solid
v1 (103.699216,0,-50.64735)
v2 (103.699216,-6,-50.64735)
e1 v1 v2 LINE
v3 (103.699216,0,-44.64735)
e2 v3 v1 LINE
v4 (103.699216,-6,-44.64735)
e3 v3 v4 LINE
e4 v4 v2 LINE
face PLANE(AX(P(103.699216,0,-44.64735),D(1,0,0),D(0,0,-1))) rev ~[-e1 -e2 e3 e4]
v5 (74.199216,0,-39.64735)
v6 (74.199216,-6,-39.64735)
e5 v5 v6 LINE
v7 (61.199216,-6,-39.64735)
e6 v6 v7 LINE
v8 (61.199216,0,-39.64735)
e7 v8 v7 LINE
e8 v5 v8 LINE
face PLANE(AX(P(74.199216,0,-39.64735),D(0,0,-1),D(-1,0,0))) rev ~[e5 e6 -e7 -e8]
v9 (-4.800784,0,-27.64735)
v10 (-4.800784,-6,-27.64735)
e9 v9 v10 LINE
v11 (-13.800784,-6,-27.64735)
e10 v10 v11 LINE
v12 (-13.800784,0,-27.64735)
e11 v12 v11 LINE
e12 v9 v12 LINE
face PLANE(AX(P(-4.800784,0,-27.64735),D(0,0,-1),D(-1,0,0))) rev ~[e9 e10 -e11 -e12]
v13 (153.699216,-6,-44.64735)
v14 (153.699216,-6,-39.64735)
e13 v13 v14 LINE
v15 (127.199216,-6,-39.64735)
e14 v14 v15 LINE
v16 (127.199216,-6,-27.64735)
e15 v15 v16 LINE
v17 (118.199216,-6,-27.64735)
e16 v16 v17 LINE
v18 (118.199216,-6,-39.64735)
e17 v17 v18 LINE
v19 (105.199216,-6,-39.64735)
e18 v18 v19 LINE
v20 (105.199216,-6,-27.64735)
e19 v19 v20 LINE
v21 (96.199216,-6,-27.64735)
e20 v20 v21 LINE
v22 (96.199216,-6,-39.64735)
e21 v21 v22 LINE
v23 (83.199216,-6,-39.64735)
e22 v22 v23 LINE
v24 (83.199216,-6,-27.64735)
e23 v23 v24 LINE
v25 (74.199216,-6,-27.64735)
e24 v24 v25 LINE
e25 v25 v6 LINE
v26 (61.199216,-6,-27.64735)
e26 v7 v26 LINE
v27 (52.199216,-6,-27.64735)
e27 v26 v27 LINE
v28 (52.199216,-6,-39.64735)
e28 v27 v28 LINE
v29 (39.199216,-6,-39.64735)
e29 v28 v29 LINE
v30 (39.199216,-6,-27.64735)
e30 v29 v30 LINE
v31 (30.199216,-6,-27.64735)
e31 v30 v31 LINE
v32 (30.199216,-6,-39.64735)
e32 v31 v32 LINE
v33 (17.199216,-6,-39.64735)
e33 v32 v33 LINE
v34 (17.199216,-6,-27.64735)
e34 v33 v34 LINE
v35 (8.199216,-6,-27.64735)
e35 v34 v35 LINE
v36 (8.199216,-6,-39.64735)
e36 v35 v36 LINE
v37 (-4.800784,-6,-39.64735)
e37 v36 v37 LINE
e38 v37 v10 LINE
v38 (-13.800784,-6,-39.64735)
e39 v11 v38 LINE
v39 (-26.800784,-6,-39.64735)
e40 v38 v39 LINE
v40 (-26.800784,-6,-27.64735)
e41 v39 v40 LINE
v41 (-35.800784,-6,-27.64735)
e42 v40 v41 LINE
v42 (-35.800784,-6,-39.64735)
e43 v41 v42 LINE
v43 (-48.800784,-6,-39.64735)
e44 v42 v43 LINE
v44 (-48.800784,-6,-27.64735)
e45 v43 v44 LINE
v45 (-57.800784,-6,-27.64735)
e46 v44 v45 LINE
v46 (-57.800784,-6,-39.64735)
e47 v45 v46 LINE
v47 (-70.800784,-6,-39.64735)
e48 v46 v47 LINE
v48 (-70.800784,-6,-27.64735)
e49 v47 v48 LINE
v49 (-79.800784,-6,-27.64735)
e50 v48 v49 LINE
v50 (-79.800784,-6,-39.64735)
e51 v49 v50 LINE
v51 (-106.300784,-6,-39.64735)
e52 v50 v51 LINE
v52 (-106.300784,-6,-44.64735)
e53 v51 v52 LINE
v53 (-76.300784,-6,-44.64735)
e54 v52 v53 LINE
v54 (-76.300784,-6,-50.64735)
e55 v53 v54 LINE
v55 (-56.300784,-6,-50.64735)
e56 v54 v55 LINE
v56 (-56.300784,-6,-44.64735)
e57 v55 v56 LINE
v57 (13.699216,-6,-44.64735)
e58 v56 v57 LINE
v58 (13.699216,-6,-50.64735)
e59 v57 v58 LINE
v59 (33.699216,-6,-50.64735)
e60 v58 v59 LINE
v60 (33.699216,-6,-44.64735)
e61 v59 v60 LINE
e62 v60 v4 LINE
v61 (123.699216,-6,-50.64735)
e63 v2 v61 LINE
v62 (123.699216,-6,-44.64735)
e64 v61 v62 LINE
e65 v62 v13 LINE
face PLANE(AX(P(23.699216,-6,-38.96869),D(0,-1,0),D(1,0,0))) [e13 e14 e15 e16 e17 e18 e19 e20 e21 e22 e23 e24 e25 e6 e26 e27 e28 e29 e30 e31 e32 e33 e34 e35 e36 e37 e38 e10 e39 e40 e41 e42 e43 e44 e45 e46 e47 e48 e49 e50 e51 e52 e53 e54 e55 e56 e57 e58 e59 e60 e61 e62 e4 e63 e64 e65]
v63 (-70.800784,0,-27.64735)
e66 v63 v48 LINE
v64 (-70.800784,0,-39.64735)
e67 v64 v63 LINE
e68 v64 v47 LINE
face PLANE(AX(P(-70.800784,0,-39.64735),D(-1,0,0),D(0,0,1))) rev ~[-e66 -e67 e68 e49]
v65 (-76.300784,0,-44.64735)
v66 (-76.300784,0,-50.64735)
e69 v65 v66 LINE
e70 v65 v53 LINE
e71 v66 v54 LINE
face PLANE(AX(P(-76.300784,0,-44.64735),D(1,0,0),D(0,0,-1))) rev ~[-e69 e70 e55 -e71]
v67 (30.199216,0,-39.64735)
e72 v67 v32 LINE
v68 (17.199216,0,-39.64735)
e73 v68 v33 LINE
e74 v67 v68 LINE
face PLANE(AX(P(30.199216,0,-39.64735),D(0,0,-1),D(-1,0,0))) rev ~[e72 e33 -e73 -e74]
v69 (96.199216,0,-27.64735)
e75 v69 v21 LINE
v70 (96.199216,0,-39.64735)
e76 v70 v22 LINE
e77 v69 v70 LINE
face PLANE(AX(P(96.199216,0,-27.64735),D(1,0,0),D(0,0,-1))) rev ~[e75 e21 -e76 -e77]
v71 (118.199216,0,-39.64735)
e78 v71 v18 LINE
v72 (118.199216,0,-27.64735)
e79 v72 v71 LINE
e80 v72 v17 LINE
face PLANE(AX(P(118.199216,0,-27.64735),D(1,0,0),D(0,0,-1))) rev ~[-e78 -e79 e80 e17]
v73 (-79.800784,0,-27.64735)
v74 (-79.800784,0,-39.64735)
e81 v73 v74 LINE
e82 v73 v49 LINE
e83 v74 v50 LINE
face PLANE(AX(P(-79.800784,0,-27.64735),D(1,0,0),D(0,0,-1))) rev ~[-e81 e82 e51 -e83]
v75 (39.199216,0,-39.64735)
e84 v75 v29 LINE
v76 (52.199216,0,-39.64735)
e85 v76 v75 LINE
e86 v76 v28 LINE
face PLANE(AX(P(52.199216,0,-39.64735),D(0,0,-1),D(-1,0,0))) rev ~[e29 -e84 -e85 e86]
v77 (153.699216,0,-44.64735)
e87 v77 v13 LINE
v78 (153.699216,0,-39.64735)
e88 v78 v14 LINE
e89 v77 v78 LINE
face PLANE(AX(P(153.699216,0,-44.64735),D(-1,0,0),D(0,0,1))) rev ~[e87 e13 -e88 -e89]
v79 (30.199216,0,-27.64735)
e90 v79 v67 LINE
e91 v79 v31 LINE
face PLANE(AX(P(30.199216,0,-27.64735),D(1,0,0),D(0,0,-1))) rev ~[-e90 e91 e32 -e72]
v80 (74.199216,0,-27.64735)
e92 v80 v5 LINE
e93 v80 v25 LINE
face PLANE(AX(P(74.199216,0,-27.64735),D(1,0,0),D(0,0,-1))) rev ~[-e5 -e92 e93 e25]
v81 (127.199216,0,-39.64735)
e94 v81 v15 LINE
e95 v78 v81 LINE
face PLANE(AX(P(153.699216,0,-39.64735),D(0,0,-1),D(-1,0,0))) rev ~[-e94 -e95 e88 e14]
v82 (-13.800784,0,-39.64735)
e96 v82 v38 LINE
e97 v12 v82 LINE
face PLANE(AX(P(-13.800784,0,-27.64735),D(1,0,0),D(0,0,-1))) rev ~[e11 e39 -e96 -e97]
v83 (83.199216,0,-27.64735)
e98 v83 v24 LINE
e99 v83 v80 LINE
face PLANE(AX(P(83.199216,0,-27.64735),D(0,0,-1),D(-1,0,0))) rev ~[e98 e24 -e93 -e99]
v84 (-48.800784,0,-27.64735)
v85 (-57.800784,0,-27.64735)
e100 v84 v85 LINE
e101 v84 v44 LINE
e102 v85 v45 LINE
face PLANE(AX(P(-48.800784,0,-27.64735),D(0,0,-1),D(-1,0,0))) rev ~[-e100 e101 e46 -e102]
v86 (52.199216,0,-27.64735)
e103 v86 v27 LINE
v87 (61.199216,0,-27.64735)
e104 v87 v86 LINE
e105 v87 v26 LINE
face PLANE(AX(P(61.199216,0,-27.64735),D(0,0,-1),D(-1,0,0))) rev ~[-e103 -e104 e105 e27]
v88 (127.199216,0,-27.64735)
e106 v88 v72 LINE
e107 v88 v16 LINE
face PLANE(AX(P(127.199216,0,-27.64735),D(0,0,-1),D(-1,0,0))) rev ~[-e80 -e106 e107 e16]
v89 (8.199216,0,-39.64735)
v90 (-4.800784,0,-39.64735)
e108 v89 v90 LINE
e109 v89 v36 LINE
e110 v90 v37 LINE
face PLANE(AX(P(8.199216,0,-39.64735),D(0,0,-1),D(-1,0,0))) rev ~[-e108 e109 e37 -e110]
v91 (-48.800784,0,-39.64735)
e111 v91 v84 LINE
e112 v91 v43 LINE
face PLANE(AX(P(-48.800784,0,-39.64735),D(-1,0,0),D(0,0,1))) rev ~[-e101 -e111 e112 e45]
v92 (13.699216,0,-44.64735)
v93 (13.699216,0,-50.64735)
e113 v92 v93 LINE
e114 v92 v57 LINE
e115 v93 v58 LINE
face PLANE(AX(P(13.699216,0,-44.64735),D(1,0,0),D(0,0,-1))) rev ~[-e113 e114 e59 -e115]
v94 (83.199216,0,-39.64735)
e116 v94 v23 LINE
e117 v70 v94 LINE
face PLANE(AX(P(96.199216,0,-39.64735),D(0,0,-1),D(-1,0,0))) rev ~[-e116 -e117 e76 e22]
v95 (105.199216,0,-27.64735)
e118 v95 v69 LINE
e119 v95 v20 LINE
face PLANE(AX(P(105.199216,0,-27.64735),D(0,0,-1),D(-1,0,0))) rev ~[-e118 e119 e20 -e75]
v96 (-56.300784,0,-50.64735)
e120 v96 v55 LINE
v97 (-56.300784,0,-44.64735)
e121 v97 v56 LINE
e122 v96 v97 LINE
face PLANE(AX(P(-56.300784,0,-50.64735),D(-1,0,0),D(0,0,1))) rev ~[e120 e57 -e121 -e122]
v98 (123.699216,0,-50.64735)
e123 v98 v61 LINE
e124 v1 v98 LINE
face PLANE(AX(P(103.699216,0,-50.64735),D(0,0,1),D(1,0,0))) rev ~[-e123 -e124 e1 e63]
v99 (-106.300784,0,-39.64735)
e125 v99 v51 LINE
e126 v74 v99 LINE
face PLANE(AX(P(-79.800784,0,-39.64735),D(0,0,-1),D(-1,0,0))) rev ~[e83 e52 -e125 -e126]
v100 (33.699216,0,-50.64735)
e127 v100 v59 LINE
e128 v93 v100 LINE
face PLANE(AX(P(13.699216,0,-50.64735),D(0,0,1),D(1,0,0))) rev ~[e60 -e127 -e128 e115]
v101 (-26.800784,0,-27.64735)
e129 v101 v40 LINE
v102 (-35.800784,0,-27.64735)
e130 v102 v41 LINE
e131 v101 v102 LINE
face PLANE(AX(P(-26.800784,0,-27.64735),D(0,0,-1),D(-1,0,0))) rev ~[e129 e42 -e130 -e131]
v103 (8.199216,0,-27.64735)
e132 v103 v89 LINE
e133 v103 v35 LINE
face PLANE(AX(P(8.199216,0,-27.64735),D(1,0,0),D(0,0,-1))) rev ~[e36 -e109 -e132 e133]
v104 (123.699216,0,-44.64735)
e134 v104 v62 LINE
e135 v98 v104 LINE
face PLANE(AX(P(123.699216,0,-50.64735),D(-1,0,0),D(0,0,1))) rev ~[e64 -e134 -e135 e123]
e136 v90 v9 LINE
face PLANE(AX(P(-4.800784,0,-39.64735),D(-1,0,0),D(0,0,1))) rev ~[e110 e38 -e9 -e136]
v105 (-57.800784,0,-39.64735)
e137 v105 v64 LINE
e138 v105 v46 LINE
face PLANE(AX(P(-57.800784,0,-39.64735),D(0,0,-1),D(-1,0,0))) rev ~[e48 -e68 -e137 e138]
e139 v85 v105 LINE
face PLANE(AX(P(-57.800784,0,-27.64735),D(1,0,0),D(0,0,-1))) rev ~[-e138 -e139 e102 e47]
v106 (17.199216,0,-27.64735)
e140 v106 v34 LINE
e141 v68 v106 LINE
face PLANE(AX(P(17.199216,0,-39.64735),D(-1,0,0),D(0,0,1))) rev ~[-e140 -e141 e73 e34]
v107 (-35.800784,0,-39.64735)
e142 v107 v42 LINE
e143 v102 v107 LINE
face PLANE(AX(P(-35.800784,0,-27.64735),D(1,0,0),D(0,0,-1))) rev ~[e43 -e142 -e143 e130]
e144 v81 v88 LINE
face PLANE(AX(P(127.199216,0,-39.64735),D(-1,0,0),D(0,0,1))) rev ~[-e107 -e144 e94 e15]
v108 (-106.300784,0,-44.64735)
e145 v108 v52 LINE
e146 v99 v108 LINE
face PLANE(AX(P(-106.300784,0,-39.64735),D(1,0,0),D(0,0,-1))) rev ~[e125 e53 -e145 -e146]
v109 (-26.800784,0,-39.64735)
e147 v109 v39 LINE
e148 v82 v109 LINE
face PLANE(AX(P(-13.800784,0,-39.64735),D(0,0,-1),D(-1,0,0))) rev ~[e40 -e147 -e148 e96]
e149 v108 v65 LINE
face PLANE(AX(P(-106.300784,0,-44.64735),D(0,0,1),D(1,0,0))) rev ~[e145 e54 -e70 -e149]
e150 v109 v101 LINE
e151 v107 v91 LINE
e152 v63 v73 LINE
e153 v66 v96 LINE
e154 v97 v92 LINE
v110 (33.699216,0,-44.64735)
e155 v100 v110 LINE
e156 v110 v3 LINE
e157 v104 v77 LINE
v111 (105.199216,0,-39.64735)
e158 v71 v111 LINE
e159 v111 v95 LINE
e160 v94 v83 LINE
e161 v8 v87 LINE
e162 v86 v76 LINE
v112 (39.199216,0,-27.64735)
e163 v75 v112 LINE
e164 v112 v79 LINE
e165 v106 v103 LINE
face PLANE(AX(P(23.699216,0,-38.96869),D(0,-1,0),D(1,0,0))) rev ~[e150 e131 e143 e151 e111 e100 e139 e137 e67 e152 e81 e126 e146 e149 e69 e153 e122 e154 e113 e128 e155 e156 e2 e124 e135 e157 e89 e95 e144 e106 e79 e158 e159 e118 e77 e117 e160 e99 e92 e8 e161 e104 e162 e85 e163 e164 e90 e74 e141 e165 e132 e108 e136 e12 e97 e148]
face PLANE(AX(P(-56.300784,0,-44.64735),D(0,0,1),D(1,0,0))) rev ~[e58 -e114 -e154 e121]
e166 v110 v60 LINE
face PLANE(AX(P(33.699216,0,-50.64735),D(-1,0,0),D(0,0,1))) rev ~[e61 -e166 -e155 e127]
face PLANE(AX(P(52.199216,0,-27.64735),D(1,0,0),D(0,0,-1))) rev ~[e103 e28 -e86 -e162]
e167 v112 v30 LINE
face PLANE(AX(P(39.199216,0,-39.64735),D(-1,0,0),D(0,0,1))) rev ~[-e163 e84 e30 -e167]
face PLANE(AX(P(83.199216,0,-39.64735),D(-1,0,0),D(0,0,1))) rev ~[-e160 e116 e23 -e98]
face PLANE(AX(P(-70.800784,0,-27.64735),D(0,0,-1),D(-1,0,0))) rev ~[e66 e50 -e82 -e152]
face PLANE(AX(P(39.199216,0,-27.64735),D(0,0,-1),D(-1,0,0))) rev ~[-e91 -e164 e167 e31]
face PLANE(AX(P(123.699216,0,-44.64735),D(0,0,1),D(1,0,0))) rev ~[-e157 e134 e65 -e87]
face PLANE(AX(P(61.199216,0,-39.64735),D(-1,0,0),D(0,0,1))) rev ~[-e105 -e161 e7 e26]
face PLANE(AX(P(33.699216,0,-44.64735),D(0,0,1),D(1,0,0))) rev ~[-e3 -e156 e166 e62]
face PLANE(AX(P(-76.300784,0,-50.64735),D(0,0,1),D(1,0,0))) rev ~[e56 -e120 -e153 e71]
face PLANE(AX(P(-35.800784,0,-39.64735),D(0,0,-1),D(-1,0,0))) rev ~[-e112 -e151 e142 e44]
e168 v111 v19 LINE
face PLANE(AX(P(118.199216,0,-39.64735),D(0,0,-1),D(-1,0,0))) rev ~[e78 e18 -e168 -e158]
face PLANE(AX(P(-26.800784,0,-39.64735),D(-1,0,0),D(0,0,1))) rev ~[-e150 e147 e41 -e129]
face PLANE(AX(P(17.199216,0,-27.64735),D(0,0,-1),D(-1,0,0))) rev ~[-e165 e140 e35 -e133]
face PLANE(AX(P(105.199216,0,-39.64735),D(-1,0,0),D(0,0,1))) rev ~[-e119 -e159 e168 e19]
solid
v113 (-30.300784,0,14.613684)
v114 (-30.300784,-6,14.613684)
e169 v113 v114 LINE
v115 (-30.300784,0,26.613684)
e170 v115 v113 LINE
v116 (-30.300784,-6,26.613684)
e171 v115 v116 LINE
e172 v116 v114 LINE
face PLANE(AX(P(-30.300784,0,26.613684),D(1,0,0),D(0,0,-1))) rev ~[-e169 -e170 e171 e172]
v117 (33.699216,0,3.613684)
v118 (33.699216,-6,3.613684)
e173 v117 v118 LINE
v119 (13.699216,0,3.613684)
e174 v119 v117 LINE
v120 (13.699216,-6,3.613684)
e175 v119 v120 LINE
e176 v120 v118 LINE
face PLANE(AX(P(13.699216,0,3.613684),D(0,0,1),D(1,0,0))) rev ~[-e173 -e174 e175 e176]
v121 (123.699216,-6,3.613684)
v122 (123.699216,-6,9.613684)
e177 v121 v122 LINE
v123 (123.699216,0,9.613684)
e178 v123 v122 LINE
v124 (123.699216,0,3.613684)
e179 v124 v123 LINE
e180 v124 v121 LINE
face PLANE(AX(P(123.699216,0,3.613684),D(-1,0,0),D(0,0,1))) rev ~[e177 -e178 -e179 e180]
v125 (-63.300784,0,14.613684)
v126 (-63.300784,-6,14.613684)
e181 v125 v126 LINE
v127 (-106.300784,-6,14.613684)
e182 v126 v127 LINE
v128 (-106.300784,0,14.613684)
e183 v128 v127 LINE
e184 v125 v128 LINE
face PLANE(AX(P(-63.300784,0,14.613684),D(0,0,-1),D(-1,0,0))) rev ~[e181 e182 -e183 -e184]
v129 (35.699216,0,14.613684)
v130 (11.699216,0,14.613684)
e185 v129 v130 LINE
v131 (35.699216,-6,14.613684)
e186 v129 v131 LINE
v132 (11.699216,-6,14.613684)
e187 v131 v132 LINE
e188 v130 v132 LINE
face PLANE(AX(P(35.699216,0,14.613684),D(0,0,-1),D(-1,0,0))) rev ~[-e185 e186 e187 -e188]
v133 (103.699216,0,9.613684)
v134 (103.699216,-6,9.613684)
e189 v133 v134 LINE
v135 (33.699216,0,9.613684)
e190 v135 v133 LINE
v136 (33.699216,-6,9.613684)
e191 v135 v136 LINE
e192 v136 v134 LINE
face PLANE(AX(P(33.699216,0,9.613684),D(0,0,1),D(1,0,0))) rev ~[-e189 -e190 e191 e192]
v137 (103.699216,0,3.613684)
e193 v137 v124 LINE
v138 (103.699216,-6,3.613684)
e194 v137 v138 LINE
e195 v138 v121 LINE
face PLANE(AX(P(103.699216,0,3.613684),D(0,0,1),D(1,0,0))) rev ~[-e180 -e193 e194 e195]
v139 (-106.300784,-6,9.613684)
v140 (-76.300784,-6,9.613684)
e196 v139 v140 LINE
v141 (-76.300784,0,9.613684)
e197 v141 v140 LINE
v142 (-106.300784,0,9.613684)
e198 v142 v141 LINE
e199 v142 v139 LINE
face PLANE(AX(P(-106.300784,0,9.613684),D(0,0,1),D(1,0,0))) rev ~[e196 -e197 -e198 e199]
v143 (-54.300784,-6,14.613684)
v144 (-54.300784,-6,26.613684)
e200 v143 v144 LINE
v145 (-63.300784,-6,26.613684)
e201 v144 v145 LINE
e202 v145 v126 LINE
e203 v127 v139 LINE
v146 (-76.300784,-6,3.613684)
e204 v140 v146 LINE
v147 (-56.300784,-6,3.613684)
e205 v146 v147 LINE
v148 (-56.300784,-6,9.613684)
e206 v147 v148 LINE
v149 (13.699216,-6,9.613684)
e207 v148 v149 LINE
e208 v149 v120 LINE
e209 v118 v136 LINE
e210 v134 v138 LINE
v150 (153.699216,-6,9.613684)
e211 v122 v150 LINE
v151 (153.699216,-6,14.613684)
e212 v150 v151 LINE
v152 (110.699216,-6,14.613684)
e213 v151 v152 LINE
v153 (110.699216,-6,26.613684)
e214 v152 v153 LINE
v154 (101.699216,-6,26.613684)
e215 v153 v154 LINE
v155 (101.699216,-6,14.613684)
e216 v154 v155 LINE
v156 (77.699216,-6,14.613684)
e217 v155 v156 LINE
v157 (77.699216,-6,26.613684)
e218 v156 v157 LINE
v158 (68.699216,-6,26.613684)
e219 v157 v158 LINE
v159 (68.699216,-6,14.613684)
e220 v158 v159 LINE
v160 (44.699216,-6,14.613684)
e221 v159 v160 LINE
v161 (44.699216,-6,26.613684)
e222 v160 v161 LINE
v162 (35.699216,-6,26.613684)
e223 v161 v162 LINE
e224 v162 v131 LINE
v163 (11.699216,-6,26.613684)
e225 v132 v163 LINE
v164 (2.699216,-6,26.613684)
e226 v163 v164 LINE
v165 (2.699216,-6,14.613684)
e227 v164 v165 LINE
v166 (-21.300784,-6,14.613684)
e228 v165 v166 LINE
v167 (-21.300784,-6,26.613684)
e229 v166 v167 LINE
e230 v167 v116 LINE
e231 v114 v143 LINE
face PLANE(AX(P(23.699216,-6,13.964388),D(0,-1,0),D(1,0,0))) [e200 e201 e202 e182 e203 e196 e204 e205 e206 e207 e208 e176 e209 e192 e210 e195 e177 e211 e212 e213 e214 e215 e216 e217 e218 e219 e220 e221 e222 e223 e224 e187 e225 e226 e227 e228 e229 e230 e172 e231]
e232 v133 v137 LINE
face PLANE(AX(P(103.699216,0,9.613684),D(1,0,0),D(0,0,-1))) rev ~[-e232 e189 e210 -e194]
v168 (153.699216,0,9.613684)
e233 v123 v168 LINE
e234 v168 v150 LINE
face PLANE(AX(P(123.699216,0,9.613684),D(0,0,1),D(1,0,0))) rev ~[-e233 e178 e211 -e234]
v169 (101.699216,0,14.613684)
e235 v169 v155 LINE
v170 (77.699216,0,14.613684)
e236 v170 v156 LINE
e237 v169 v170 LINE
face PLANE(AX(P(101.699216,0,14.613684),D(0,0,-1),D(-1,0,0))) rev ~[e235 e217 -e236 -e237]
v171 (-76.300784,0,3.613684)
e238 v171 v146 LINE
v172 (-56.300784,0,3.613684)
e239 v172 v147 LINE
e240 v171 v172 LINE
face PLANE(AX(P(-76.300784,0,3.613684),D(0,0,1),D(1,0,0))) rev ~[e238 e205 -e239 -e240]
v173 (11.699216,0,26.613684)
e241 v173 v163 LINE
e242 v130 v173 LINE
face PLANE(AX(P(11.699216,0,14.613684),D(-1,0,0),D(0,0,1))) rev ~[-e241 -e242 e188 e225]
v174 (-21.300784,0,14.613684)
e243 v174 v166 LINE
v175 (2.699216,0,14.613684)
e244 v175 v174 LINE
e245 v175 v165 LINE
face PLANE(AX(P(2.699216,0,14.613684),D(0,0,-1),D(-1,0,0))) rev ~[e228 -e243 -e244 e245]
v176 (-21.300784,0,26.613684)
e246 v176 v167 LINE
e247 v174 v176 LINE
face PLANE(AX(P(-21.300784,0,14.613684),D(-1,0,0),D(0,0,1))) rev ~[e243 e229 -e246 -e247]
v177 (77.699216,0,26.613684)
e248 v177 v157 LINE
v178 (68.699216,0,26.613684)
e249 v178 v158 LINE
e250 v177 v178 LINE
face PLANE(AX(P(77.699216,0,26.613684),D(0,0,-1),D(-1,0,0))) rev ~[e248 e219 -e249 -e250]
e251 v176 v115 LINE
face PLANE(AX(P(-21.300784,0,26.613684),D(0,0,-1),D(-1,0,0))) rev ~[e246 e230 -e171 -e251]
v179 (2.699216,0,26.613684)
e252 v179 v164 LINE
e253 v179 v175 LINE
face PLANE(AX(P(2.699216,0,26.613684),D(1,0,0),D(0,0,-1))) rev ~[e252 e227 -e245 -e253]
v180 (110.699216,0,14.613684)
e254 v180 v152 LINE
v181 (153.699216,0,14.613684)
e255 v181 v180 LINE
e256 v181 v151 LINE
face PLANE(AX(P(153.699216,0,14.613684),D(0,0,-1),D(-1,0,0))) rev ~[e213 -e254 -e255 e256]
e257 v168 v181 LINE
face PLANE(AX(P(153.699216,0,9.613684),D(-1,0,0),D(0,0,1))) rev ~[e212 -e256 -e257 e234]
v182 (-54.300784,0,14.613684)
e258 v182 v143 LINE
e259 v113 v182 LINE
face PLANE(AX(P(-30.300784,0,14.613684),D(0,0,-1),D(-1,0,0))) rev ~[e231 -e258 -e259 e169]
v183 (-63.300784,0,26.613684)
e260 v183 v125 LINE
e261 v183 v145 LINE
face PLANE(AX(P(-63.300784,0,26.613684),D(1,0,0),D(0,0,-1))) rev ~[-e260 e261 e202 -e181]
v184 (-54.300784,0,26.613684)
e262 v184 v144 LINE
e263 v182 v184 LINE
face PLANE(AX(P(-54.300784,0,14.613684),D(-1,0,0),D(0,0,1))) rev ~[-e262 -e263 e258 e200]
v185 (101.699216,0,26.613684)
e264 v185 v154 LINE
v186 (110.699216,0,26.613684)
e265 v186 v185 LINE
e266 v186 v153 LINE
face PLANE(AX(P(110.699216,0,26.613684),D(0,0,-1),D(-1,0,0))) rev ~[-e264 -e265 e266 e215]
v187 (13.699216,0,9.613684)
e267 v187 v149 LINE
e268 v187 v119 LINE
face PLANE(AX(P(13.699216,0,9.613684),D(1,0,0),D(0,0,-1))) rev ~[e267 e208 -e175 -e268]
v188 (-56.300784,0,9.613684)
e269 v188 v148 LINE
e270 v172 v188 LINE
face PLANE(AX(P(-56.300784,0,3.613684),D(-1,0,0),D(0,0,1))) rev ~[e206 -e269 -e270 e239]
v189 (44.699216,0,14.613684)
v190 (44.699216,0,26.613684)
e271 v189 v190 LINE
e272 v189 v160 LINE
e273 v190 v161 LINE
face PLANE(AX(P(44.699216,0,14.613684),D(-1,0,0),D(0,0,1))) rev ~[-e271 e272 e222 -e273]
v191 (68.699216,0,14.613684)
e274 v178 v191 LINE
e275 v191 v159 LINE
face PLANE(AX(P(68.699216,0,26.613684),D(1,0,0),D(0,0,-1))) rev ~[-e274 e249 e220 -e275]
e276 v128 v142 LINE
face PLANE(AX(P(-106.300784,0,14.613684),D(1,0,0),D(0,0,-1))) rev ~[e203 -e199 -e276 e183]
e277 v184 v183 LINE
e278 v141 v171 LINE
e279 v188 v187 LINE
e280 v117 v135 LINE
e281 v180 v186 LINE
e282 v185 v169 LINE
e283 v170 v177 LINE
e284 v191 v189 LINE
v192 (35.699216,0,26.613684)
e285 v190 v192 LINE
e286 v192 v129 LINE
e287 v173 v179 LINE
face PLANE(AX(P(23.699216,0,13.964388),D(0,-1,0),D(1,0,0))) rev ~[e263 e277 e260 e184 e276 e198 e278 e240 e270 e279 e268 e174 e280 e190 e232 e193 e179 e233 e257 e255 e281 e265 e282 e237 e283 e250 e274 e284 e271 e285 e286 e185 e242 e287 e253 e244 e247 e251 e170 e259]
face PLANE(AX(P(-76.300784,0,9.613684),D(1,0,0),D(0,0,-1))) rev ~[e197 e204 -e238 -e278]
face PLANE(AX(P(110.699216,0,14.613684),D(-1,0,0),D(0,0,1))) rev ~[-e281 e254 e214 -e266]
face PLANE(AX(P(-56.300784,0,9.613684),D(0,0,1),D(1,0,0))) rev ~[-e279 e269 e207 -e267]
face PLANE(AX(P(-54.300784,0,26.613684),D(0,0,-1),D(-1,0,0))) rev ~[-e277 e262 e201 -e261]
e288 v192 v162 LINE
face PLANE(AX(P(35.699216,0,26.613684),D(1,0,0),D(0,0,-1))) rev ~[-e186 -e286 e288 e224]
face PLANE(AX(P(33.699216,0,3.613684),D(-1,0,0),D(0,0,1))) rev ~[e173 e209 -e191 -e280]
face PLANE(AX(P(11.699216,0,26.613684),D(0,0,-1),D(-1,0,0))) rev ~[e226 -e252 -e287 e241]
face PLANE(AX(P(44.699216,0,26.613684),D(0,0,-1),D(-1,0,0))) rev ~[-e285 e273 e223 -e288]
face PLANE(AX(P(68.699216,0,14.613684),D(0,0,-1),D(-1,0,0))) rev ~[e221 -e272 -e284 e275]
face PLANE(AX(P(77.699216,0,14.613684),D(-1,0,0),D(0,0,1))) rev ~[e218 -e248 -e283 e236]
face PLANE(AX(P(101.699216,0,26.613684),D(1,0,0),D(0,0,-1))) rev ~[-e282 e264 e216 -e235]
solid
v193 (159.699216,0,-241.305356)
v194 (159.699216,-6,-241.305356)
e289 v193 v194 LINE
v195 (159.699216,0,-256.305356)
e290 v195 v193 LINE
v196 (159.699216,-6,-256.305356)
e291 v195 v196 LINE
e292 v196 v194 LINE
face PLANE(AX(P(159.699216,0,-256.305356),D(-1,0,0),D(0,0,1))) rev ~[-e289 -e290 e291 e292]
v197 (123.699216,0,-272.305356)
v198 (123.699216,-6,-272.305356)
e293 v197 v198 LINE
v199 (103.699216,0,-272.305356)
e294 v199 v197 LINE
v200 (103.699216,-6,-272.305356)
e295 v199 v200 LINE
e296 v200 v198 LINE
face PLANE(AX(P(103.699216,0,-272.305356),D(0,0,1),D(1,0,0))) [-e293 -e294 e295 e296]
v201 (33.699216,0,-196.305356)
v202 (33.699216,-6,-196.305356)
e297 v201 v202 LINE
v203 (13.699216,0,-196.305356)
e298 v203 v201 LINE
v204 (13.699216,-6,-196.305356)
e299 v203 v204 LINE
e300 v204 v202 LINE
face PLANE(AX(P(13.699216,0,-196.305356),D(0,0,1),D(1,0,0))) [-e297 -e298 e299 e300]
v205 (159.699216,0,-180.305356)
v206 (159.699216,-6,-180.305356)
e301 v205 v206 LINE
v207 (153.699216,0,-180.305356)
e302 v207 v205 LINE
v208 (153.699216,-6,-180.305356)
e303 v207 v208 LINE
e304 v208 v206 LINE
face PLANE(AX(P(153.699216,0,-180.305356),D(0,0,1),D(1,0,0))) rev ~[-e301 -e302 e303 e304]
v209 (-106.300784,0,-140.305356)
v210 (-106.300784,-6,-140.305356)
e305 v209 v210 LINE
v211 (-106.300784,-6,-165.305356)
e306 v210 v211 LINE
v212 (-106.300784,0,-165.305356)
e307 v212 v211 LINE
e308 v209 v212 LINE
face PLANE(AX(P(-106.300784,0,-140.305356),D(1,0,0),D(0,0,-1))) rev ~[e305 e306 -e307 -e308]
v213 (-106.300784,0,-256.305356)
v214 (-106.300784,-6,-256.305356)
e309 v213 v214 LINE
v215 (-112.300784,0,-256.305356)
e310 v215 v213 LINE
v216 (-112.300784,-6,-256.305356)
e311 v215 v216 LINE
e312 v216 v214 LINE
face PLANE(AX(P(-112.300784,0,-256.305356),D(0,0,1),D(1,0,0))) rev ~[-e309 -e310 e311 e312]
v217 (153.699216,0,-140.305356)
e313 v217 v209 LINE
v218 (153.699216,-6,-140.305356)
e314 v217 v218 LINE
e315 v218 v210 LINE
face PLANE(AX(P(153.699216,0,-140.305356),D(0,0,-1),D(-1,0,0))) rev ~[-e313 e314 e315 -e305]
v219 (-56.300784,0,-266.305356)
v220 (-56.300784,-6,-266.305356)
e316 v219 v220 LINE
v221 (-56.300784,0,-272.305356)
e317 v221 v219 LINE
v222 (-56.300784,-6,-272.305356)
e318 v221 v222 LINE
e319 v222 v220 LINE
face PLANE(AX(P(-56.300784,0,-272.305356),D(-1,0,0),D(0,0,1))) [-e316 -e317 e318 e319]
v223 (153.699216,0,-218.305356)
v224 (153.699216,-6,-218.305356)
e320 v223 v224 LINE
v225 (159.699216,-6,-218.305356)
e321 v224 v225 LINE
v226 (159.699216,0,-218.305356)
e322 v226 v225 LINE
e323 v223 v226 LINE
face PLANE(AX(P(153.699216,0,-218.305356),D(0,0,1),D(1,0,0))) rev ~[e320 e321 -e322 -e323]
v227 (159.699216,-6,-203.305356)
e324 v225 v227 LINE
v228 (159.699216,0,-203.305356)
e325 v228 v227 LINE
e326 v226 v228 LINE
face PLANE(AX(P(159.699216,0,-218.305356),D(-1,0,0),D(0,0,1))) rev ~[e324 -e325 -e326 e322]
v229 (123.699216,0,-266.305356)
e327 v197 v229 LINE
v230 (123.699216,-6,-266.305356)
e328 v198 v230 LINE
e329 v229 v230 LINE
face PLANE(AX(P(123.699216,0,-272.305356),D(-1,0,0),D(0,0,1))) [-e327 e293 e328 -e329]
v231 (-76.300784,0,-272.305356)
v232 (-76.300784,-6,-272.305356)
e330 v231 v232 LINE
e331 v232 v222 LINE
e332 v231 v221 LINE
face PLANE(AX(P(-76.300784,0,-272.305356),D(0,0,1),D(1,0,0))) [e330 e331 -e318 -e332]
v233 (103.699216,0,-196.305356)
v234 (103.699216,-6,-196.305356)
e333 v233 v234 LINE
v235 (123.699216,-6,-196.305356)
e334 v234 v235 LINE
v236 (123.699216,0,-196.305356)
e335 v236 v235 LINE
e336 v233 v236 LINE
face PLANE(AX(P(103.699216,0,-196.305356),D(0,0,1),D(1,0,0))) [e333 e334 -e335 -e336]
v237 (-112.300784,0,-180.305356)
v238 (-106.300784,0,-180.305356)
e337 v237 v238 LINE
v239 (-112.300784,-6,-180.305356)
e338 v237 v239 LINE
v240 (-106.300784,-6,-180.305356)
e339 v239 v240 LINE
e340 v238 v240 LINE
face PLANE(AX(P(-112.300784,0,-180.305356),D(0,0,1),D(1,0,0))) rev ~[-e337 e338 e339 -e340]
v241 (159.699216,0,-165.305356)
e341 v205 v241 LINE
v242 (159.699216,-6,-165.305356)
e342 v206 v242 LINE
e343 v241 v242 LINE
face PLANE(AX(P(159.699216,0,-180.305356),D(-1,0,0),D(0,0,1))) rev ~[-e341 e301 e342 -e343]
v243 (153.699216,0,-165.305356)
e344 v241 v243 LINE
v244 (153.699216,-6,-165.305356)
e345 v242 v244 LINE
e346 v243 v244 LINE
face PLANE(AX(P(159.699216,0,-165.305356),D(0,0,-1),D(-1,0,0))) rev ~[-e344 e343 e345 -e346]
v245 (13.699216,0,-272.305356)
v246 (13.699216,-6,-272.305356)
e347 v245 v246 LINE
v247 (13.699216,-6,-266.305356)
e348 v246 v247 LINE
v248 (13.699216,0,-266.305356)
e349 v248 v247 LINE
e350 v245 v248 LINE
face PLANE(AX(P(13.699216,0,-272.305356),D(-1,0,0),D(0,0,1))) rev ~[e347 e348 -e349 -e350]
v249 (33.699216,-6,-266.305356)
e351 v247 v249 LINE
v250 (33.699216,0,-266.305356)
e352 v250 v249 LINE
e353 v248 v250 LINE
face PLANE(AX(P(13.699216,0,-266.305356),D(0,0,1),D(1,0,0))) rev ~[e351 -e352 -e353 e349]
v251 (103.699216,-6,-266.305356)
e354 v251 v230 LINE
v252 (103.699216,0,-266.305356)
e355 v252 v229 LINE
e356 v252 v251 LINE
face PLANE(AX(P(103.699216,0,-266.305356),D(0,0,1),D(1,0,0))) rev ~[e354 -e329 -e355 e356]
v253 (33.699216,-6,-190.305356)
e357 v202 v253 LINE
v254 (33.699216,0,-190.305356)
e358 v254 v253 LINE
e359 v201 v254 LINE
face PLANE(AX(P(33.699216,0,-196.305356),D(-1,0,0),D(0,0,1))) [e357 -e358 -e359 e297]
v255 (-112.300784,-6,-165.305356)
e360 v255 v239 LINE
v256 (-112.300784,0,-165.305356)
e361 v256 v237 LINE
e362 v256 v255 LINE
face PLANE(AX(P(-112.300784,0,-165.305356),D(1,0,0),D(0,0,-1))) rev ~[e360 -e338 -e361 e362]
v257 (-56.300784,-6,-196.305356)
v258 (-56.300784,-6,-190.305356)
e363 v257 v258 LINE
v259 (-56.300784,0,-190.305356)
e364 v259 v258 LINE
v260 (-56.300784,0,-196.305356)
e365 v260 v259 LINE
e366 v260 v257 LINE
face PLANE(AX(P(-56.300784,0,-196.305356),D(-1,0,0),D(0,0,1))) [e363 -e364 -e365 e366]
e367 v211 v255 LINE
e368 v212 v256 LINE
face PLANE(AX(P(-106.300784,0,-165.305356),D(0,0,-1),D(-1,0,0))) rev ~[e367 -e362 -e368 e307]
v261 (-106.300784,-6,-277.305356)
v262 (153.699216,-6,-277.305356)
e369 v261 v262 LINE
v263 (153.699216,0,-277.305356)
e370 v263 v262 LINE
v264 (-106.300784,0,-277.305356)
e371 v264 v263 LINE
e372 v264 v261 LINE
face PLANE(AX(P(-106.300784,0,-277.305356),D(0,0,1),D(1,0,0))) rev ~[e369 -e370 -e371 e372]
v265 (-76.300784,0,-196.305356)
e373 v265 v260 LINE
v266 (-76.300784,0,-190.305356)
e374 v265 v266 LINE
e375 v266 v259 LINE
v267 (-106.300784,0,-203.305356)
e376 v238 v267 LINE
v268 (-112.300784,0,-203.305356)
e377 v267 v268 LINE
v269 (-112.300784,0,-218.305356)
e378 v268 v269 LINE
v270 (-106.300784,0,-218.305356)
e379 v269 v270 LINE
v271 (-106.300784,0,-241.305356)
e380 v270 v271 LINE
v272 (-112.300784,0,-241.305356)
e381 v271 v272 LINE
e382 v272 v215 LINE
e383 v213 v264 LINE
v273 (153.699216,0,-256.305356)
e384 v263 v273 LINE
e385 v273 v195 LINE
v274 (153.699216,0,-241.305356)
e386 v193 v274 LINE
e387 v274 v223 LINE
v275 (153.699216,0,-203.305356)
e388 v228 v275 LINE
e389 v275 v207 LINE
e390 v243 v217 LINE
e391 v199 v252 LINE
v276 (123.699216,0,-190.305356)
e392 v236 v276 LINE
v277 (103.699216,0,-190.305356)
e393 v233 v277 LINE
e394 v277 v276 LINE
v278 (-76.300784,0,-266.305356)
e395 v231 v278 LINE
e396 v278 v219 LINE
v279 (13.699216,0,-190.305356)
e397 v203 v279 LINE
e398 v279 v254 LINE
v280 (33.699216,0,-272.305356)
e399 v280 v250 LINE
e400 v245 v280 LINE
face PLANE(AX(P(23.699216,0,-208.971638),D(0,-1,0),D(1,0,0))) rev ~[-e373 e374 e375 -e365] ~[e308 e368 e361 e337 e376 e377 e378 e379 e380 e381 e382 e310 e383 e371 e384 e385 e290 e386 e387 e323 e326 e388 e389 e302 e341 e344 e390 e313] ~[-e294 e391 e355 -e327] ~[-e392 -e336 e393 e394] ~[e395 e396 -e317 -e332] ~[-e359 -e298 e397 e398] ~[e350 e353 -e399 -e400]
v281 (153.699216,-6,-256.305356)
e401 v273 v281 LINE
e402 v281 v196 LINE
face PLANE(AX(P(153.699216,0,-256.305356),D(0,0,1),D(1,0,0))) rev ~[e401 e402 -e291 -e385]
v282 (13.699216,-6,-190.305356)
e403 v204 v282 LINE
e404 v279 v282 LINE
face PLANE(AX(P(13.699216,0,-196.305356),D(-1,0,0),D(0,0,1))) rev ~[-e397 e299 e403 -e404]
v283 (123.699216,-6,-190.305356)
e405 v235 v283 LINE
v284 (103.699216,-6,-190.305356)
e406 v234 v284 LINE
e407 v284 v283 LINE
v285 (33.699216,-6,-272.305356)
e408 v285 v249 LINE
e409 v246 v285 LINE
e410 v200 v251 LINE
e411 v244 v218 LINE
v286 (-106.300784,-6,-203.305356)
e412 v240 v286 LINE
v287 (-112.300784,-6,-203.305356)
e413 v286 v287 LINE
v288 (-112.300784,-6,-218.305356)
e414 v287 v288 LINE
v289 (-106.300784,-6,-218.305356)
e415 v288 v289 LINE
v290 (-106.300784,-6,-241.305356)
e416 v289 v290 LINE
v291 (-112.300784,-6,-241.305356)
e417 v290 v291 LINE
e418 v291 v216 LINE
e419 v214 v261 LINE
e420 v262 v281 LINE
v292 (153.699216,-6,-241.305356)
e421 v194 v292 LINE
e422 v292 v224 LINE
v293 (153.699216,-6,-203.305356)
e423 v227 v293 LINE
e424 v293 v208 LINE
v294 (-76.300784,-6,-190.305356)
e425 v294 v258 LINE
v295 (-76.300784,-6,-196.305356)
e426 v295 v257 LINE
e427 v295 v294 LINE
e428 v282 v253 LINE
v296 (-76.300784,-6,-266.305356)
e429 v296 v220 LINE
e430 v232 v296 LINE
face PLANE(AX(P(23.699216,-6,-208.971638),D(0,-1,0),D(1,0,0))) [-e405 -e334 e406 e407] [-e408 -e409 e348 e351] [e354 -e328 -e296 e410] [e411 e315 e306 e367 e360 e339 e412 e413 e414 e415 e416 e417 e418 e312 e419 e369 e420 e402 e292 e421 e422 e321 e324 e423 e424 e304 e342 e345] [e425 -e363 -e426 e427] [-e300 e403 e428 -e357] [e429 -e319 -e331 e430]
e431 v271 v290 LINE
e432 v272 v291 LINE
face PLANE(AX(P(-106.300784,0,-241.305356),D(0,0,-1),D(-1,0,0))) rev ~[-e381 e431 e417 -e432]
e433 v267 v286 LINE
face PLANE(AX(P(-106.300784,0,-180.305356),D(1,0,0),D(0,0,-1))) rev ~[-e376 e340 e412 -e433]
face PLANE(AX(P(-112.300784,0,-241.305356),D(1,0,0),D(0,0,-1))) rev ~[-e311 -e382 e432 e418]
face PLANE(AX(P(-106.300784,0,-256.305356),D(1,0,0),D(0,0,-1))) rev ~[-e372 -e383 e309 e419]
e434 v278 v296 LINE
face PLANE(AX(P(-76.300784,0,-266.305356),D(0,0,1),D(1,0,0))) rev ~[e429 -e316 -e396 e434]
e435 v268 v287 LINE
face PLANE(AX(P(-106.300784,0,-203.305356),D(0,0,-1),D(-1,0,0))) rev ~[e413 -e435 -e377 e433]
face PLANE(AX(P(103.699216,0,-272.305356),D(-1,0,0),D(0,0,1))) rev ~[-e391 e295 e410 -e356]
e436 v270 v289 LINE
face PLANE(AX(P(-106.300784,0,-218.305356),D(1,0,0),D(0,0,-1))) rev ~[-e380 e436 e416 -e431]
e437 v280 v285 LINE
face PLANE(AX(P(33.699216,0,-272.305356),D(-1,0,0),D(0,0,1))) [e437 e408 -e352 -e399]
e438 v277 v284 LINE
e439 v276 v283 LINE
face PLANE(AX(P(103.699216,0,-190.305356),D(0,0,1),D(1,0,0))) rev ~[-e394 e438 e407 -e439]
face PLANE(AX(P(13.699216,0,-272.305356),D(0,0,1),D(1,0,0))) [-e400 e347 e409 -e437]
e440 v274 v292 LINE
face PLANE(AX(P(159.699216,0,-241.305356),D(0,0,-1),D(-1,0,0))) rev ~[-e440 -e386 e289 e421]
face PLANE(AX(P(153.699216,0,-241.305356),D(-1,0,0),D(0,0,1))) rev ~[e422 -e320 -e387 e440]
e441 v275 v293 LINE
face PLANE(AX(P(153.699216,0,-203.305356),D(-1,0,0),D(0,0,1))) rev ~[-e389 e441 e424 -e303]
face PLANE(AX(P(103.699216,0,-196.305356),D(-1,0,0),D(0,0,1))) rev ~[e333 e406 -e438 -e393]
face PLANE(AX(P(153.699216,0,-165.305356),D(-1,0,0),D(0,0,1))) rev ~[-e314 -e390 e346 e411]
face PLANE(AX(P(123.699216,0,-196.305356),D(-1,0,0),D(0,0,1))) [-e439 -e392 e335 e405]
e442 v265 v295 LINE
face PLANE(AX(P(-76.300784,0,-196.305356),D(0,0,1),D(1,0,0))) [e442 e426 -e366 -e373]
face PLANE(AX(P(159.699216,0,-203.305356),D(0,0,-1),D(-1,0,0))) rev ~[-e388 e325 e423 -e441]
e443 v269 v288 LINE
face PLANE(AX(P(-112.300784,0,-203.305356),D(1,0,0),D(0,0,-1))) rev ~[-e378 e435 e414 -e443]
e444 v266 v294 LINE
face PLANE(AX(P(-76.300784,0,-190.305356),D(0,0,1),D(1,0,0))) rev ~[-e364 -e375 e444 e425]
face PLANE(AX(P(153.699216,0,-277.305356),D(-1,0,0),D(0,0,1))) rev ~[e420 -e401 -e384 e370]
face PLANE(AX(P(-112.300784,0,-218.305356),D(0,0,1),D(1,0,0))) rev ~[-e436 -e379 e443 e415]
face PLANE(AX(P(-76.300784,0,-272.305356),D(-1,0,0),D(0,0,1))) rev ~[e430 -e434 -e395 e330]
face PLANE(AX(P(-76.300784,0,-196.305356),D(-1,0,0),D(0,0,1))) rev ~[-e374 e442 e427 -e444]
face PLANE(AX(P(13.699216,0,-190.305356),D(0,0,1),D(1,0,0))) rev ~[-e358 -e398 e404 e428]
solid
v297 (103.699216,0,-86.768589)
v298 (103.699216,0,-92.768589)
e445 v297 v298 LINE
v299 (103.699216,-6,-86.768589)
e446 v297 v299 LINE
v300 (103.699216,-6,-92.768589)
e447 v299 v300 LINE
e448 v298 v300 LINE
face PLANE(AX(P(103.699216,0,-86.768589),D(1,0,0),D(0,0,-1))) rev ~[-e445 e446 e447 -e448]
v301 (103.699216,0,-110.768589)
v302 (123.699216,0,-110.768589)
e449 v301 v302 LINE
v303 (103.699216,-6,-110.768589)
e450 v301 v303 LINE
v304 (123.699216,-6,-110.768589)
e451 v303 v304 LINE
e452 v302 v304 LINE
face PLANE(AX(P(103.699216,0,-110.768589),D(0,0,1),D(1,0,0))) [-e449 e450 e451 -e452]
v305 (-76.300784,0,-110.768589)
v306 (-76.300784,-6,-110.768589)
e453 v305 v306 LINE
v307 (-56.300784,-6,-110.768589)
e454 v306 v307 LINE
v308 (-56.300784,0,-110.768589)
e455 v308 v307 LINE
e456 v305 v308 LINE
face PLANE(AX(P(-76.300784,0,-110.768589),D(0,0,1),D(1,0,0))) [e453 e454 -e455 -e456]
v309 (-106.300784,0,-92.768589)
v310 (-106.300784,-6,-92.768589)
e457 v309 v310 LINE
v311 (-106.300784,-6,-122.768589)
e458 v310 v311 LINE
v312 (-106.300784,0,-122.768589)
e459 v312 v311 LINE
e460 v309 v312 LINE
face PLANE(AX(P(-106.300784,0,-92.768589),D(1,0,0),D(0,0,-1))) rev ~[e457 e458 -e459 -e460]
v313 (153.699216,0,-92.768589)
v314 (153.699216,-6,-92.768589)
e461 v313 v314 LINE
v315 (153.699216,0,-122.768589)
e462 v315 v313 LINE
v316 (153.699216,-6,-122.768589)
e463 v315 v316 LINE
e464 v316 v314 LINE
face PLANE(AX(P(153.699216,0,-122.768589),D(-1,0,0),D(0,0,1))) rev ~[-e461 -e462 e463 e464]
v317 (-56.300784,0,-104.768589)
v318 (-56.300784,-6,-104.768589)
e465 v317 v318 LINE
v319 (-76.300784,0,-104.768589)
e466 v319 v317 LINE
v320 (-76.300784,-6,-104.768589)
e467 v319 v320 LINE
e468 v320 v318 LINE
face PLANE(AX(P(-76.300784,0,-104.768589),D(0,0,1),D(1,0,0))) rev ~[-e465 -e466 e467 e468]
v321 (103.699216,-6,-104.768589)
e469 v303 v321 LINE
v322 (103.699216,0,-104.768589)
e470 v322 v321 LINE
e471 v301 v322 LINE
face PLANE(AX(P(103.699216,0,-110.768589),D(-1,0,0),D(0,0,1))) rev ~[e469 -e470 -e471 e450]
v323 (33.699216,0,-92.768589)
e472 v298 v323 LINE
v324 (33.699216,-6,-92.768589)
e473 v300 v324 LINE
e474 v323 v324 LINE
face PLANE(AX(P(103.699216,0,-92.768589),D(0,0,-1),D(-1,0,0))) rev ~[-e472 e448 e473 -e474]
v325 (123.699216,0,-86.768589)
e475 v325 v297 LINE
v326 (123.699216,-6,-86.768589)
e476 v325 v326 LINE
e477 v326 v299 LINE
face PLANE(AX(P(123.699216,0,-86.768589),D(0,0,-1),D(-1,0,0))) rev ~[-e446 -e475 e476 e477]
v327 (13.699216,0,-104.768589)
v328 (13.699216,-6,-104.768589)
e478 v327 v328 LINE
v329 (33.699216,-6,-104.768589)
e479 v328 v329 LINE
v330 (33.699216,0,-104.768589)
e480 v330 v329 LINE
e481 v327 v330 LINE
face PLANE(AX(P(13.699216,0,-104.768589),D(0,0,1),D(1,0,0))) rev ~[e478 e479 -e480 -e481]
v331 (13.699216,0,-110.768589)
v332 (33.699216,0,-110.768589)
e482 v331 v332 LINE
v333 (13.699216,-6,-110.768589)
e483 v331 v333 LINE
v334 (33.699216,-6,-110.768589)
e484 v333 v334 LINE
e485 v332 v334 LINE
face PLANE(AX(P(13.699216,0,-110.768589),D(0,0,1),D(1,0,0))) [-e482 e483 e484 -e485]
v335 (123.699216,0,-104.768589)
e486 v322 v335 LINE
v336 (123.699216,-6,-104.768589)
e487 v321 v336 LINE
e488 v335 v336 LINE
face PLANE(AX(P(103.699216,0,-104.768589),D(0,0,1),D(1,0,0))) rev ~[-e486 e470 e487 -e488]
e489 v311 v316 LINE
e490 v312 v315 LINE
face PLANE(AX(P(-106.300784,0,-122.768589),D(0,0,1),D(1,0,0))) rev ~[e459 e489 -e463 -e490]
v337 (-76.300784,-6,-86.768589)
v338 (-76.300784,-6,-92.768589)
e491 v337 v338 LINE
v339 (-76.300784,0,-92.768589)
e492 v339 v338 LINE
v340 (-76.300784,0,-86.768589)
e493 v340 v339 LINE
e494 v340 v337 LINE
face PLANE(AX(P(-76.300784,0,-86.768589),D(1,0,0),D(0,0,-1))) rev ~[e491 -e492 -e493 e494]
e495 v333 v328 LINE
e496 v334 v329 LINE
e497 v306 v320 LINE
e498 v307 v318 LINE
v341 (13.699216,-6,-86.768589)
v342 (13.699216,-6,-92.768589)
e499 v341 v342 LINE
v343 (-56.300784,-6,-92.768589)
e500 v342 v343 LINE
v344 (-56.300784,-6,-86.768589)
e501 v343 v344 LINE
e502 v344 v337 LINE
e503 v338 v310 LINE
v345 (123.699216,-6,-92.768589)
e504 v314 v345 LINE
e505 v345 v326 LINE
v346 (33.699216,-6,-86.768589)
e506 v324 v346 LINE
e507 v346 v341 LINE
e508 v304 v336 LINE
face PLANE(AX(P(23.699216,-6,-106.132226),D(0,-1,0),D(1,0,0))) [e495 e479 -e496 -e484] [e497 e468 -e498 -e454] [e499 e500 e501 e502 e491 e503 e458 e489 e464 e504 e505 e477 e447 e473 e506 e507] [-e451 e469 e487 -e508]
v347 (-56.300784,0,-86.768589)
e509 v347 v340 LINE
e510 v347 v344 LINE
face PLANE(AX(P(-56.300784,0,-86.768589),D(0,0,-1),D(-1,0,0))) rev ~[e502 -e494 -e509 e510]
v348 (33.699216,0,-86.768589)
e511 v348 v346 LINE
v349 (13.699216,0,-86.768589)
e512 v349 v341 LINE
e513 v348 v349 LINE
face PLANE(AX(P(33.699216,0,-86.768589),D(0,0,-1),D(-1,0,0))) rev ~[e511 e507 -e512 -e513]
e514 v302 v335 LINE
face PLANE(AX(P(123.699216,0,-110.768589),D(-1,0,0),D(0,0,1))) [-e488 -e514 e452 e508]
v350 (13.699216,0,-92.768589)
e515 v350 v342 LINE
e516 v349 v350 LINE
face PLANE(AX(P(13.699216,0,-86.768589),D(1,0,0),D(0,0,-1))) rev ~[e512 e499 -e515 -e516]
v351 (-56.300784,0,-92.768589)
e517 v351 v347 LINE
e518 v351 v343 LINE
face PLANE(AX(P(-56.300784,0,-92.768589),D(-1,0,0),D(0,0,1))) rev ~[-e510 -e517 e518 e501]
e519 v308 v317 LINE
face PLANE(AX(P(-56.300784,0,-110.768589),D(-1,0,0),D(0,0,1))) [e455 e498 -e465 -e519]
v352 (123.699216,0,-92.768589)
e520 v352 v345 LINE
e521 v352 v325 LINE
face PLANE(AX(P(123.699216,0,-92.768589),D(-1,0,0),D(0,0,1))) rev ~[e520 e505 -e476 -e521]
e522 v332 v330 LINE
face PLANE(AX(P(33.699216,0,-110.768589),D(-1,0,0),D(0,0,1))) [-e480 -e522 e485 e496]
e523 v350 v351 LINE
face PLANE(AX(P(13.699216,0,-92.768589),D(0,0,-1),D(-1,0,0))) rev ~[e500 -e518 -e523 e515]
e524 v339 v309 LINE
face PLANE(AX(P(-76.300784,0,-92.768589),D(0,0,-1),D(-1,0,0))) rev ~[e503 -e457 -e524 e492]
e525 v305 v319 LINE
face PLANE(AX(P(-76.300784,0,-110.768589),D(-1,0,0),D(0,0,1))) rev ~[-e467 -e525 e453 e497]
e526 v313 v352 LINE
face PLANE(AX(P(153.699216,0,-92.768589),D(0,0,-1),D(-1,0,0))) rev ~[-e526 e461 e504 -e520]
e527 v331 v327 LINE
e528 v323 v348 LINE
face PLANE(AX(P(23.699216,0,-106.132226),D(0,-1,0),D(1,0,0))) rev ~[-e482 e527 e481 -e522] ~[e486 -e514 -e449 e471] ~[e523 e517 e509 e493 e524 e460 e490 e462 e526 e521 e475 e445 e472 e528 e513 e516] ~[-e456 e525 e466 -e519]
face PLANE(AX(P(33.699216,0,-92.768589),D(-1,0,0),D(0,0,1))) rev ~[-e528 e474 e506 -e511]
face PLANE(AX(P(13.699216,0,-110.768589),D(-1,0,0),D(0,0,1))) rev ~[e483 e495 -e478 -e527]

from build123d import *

# Parameters (mm, degrees)
F0_W     = 20
F0_H     = 6
F1_DEPTH = 6
F2_DEPTH = 6
F3_DEPTH = 6
F4_DEPTH = 6


# Not quite as in the source:
# - a feature names something its author has since deleted; it is built from what else it names


with BuildPart() as f1:
    # F0 (on Front) → F1 (new body)
    with BuildSketch(Plane.XZ):
        Polygon((153.699216228, -140.3053558618), (-106.300783772, -140.3053558618), (-106.300783772, -165.3053558618), (-112.300783772, -165.3053558618), (-112.300783772, -180.3053558618), (-106.300783772, -180.3053558618), (-106.300783772, -203.3053558618), (-112.300783772, -203.3053558618), (-112.300783772, -218.3053558618), (-106.300783772, -218.3053558618), (-106.300783772, -241.3053558618), (-112.300783772, -241.3053558618), (-112.300783772, -256.3053558618), (-106.300783772, -256.3053558618), (-106.300783772, -277.3053558618), (153.699216228, -277.3053558618), (153.699216228, -256.3053558618), (159.699216228, -256.3053558618), (159.699216228, -241.3053558618), (153.699216228, -241.3053558618), (153.699216228, -218.3053558618), (159.699216228, -218.3053558618), (159.699216228, -203.3053558618), (153.699216228, -203.3053558618), (153.699216228, -180.3053558618), (159.699216228, -180.3053558618), (159.699216228, -165.3053558618), (153.699216228, -165.3053558618), align=None)
        with Locations((-66.300783772, -269.3053558618)):
            Rectangle(F0_W, F0_H, mode=Mode.SUBTRACT)
        with Locations((-66.300783772, -193.3053558618)):
            Rectangle(F0_W, F0_H, mode=Mode.SUBTRACT)
        with Locations((23.699216228, -193.3053558618)):
            Rectangle(F0_W, F0_H, mode=Mode.SUBTRACT)
        with Locations((23.699216228, -269.3053558618)):
            Rectangle(F0_W, F0_H, mode=Mode.SUBTRACT)
        with Locations((113.699216228, -269.3053558618)):
            Rectangle(F0_W, F0_H, mode=Mode.SUBTRACT)
        with Locations((113.699216228, -193.3053558618)):
            Rectangle(F0_W, F0_H, mode=Mode.SUBTRACT)
    extrude(amount=F1_DEPTH)


with BuildPart() as f2:
    # F0 (on Front) → F2 (new body)
    with BuildSketch(Plane.XZ):
        Polygon((-76.300783772, -92.7685894072), (-106.300783772, -92.7685894072), (-106.300783772, -122.7685894072), (153.699216228, -122.7685894072), (153.699216228, -92.7685894072), (123.699216228, -92.7685894072), (123.699216228, -86.7685894072), (103.699216228, -86.7685894072), (103.699216228, -92.7685894072), (33.699216228, -92.7685894072), (33.699216228, -86.7685894072), (13.699216228, -86.7685894072), (13.699216228, -92.7685894072), (-56.300783772, -92.7685894072), (-56.300783772, -86.7685894072), (-76.300783772, -86.7685894072), align=None)
        with Locations((-66.300783772, -107.7685894072)):
            Rectangle(F0_W, F0_H, mode=Mode.SUBTRACT)
        with Locations((23.699216228, -107.7685894072)):
            Rectangle(F0_W, F0_H, mode=Mode.SUBTRACT)
        with Locations((113.699216228, -107.7685894072)):
            Rectangle(F0_W, F0_H, mode=Mode.SUBTRACT)
    extrude(amount=F2_DEPTH)


with BuildPart() as f3:
    # F0 (on Front) → F3 (new body)
    with BuildSketch(Plane.XZ):
        Polygon((-63.300783772, 26.6136842668), (-63.300783772, 14.6136842668), (-106.300783772, 14.6136842668), (-106.300783772, 9.6136842668), (-76.300783772, 9.6136842668), (-76.300783772, 3.6136842668), (-56.300783772, 3.6136842668), (-56.300783772, 9.6136842668), (13.699216228, 9.6136842668), (13.699216228, 3.6136842668), (33.699216228, 3.6136842668), (33.699216228, 9.6136842668), (103.699216228, 9.6136842668), (103.699216228, 3.6136842668), (123.699216228, 3.6136842668), (123.699216228, 9.6136842668), (153.699216228, 9.6136842668), (153.699216228, 14.6136842668), (134.699216228, 14.6136842668), (110.699216228, 14.6136842668), (110.699216228, 26.6136842668), (101.699216228, 26.6136842668), (101.699216228, 14.6136842668), (77.699216228, 14.6136842668), (77.699216228, 26.6136842668), (68.699216228, 26.6136842668), (68.699216228, 14.6136842668), (44.699216228, 14.6136842668), (44.699216228, 26.6136842668), (35.699216228, 26.6136842668), (35.699216228, 14.6136842668), (11.699216228, 14.6136842668), (11.699216228, 26.6136842668), (2.699216228, 26.6136842668), (2.699216228, 14.6136842668), (-21.300783772, 14.6136842668), (-21.300783772, 26.6136842668), (-30.300783772, 26.6136842668), (-30.300783772, 14.6136842668), (-54.300783772, 14.6136842668), (-54.300783772, 26.6136842668), align=None)
    extrude(amount=F3_DEPTH)


with BuildPart() as f4:
    # F0 (on Front) → F4 (new body)
    with BuildSketch(Plane.XZ):
        Polygon((-79.800783772, -27.6473498154), (-79.800783772, -39.6473498154), (-106.300783772, -39.6473498154), (-106.300783772, -44.6473498154), (-76.300783772, -44.6473498154), (-76.300783772, -50.6473498154), (-56.300783772, -50.6473498154), (-56.300783772, -44.6473498154), (13.699216228, -44.6473498154), (13.699216228, -50.6473498154), (33.699216228, -50.6473498154), (33.699216228, -44.6473498154), (103.699216228, -44.6473498154), (103.699216228, -50.6473498154), (123.699216228, -50.6473498154), (123.699216228, -44.6473498154), (153.699216228, -44.6473498154), (153.699216228, -39.6473498154), (140.199216228, -39.6473498154), (127.199216228, -39.6473498154), (127.199216228, -27.6473498154), (118.199216228, -27.6473498154), (118.199216228, -39.6473498154), (105.199216228, -39.6473498154), (105.199216228, -27.6473498154), (96.199216228, -27.6473498154), (96.199216228, -39.6473498154), (83.199216228, -39.6473498154), (83.199216228, -27.6473498154), (74.199216228, -27.6473498154), (74.199216228, -39.6473498154), (61.199216228, -39.6473498154), (61.199216228, -27.6473498154), (52.199216228, -27.6473498154), (52.199216228, -39.6473498154), (39.199216228, -39.6473498154), (39.199216228, -27.6473498154), (30.199216228, -27.6473498154), (30.199216228, -39.6473498154), (17.199216228, -39.6473498154), (17.199216228, -27.6473498154), (8.199216228, -27.6473498154), (8.199216228, -39.6473498154), (-4.800783772, -39.6473498154), (-4.800783772, -27.6473498154), (-13.800783772, -27.6473498154), (-13.800783772, -39.6473498154), (-26.800783772, -39.6473498154), (-26.800783772, -27.6473498154), (-35.800783772, -27.6473498154), (-35.800783772, -39.6473498154), (-48.800783772, -39.6473498154), (-48.800783772, -27.6473498154), (-57.800783772, -27.6473498154), (-57.800783772, -39.6473498154), (-70.800783772, -39.6473498154), (-70.800783772, -27.6473498154), align=None)
    extrude(amount=F4_DEPTH)


solid = Compound([f1.part, f2.part, f3.part, f4.part])
